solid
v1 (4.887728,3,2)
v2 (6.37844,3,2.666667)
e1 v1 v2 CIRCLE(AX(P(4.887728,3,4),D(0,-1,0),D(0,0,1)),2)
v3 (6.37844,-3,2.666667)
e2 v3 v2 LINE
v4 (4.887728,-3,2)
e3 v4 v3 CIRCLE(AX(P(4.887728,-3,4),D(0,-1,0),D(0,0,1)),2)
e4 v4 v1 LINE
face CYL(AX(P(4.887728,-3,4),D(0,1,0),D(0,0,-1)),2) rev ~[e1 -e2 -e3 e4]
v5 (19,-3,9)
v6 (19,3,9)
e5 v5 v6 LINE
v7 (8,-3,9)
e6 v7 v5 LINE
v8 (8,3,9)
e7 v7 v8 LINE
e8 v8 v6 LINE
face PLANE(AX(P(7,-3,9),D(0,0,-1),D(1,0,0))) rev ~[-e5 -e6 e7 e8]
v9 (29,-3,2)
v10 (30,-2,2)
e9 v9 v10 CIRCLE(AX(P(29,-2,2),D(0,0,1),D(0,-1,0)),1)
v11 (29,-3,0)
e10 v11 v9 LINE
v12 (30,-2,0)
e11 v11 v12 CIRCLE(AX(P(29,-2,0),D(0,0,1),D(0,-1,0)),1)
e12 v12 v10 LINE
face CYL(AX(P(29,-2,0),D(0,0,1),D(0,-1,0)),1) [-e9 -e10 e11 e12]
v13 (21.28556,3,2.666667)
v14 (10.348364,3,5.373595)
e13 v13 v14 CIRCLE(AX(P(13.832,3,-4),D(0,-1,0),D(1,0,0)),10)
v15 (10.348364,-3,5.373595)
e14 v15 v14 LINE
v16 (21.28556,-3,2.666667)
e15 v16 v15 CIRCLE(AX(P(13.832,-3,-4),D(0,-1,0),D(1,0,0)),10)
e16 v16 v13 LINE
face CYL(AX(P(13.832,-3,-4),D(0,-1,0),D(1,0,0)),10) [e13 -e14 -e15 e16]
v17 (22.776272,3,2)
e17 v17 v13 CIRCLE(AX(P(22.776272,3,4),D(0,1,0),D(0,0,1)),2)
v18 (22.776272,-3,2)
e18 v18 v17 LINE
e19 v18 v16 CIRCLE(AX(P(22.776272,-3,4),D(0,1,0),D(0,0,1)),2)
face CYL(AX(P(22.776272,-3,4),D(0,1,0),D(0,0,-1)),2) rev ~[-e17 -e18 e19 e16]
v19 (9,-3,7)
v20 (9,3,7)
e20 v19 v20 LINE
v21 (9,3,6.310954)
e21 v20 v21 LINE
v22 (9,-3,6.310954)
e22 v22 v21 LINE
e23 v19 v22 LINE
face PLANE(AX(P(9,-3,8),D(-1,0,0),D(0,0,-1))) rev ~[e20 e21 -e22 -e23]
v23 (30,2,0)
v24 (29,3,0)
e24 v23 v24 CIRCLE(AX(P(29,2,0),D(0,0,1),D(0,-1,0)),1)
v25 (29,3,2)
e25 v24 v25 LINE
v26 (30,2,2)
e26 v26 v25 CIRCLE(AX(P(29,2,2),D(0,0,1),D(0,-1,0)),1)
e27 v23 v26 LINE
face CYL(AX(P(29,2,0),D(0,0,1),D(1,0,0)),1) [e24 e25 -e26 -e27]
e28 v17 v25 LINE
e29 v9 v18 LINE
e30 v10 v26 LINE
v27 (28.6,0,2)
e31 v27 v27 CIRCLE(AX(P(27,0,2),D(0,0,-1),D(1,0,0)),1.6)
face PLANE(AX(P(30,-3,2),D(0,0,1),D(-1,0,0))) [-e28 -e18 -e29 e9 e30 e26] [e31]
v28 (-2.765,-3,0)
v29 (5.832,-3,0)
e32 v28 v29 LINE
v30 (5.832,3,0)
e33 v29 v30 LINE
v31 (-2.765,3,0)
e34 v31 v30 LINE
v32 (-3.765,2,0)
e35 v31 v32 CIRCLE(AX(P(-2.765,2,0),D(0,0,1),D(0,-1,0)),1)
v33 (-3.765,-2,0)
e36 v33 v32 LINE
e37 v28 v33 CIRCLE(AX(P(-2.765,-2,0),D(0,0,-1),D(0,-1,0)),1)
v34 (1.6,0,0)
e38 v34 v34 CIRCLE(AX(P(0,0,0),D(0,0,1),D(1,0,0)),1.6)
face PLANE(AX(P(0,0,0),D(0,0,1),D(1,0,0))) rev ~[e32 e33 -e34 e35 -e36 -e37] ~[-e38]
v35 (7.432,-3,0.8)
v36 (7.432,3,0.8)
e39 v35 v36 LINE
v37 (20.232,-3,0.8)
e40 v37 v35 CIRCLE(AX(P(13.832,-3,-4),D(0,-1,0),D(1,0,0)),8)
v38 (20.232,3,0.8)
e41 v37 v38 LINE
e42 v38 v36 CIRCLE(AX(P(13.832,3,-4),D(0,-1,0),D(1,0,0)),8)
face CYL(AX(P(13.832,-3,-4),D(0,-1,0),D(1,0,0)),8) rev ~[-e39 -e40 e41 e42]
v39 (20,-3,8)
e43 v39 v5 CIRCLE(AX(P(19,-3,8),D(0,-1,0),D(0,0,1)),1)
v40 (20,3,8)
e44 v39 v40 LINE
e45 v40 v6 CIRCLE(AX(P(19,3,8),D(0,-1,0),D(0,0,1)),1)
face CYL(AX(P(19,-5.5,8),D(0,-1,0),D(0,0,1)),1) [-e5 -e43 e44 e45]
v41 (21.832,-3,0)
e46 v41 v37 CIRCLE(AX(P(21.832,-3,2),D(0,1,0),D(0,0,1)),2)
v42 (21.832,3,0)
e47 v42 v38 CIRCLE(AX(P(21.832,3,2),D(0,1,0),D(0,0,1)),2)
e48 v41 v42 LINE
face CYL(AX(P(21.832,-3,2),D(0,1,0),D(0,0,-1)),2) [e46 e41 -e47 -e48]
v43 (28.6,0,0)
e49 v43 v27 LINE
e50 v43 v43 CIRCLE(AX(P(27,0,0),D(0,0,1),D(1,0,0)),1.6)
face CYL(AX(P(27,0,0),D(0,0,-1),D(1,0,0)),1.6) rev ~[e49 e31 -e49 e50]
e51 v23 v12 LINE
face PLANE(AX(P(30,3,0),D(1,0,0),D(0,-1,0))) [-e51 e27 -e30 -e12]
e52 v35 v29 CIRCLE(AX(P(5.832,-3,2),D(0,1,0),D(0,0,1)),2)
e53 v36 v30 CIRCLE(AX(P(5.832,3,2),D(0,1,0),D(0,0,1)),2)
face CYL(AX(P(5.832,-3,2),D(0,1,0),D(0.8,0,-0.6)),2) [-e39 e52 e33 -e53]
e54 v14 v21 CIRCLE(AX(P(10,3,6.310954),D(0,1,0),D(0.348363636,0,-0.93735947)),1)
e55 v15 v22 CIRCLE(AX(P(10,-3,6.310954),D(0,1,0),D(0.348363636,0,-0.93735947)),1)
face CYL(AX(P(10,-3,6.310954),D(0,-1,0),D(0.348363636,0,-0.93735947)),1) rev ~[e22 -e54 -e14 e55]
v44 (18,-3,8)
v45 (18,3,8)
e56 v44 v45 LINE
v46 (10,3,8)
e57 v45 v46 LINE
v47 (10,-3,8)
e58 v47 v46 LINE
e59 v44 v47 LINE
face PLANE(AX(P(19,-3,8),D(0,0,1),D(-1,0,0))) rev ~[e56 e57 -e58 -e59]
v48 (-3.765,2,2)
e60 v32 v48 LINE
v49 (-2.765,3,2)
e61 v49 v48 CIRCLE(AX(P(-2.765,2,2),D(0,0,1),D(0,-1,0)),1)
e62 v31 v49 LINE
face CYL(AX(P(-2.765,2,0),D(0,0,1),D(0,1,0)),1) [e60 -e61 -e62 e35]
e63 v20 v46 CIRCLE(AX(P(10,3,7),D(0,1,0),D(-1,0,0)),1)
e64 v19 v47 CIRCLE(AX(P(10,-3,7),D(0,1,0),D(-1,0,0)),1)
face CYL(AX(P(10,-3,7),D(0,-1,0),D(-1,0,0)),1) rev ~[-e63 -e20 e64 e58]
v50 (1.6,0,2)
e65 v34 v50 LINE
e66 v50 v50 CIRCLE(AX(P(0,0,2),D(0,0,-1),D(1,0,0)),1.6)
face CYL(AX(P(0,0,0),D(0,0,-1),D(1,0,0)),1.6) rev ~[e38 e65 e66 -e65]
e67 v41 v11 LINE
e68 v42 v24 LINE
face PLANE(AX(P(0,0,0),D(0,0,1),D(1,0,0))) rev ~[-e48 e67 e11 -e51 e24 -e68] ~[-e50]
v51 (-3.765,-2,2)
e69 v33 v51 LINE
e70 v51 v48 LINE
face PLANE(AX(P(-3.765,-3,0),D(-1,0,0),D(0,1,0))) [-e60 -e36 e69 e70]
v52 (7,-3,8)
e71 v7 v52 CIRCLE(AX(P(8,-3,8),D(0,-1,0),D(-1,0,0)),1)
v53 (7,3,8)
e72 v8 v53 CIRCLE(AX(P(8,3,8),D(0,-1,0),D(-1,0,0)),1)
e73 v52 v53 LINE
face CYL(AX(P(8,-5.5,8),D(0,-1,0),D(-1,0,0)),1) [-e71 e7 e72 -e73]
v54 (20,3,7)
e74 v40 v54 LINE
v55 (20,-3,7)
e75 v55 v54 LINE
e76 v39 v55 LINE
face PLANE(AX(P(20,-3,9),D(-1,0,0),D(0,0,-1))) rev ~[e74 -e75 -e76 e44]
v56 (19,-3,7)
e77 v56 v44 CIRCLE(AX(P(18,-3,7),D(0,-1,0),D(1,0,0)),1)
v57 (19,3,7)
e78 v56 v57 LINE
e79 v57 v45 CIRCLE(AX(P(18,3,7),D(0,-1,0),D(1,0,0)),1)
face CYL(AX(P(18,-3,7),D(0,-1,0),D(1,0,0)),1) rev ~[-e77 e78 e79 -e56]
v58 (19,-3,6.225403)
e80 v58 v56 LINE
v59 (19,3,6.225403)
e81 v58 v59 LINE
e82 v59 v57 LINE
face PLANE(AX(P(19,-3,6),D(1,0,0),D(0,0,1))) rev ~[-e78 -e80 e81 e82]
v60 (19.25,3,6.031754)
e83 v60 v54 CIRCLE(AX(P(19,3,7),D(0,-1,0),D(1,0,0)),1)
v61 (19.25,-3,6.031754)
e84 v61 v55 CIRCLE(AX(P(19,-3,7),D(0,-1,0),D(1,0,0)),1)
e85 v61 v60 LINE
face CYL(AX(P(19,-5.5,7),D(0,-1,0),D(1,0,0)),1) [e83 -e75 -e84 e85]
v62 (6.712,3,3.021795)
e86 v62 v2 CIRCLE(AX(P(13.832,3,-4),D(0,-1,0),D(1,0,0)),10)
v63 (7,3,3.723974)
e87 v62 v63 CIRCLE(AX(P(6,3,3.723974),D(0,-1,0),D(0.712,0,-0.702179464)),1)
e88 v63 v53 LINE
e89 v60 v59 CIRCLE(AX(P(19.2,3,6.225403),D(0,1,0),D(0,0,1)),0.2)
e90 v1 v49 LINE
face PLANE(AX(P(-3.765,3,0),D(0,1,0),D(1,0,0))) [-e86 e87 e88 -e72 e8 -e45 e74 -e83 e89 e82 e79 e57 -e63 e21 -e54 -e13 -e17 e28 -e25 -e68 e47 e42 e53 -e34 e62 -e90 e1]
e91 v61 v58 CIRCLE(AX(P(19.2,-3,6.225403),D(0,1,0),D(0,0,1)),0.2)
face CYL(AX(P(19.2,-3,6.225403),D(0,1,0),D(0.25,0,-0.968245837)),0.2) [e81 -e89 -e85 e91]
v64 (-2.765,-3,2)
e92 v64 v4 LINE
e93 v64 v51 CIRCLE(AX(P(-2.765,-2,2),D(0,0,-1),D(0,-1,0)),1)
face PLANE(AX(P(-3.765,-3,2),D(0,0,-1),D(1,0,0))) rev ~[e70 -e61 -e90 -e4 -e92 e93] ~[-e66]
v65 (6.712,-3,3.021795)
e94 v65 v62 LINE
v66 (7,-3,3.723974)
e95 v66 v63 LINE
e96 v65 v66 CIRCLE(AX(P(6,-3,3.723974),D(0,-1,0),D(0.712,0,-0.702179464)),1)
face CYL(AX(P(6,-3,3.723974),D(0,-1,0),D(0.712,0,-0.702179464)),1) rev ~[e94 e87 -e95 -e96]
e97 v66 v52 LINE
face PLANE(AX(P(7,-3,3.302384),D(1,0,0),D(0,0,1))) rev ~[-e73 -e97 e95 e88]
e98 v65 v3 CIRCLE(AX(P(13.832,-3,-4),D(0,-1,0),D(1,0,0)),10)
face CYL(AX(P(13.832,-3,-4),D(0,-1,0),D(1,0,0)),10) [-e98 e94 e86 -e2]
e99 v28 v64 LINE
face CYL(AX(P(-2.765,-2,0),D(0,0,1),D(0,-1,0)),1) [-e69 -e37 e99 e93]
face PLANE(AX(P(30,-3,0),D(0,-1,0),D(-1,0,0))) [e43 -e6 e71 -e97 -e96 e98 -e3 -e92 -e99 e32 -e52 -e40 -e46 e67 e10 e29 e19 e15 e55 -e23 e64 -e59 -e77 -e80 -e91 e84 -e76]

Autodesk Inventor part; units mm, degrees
ref_plane "YZ Plane" through (0, 0, 0) normal (1, 0, 0) x (0, 1, 0)
ref_plane "XZ Plane" through (0, 0, 0) normal (0, 1, 0) x (-1, 0, 0)
ref_plane "XY Plane" through (0, 0, 0) normal (0, 0, 1) x (1, 0, 0)
sketch "Skizze1" plane through (0, 0, 0) normal (0, 0, 1) x (1, 0, 0)
  line L0 (30, 3) -> (30, -3)
  line L1 (30, -3) -> (-3.765, -3)
  line L2 (-3.765, -3) -> (-3.765, 3)
  line L3 (-3.765, 3) -> (30, 3)
  circle A0 centre (0, 0) radius 1.6
  circle A1 centre (0, 0) radius 1.6
  circle A2 centre (27, 0) radius 1.6
  circle A3 centre (27, 0) radius 1.6
  line L4 (21.832, 1.0001) -> (21.832, -3)
  line L5 (21.832, -3) -> (5.832, -3)
  line L6 (5.832, -3) -> (5.832, 1.0001)
  line L7 (5.832, 1.0001) -> (21.832, 1.0001)
  dimension "d0" = 6
extrude "Extrusion1" add sketch "Skizze1" along normal blind 7
sketch "Skizze2" plane through (-3.765, -3, 0) normal (0, -1, 0) x (1, 0, 0)
  line L0 (0, 0) -> (33.765, 0) projected
  line L1 (0, 0) -> (9.597, 0)
  line L2 (9.597, 0) -> (25.597, 0)
  line L3 (17.597, 0) -> (17.597, -4)
  circle A0 centre (17.597, -4) radius 8
  line L4 (0, 0) -> (0, 2)
  circle A1 centre (17.597, -4) radius 10
  line L5 (0, 2) -> (9.597, 2)
  line L6 (0, 0) -> (0, 7) projected
  line L7 (33.765, 0) -> (33.765, 2)
  line L8 (33.765, 0) -> (33.765, 7) projected
  line L9 (33.765, 2) -> (25.597, 2)
  line L10 (33.765, 7) -> (0, 7) projected
  line L11 (0, 7) -> (33.765, 7)
  line L12 (33.765, 7) -> (33.765, 0)
  line L13 (33.765, 0) -> (0, 0)
  line L14 (0, 0) -> (0, 7)
  point P0 (3.765, 0)
  point P1 (24.5252, 0)
  point P2 (10.6688, 0)
  point P3 (17.597, 7)
  point P4 (8.4318, 0)
  point P5 (26.7622, 0)
  dimension "d3" = 9.597
  dimension "d4" = 16
  dimension "d5" = 4
  dimension "d6" = 16
  dimension "d7" = 2
  dimension "d8" = 2
  dimension "d9" = 2
extrude "Extrusion2" cut sketch "Skizze2" against normal blind 7 contours L6 L10 L8 L9 A1 L5 | A0 L0 picked at (13.3479, 0.4966)
fillet "Rundung1" radius 2 4 edges at (5.832, 0, 2) (6.9038, 0, 0) (20.7602, 0, 0) (21.832, 0, 2)
fillet "Rundung2" radius 1 4 edges at (-3.765, -3, 1) (30, -3, 1) (30, 3, 1) (-3.765, 3, 1)
sketch "Skizze3" plane through (13.832, -3, -4) normal (0, -1, 0) x (1, 0, 0)
  line L0 (-13.832, 4) -> (-6.832, 4)
  line L1 (-15.432, 3) -> (-12.232, 3) projected
  line L2 (-6.832, 4) -> (-6.832, 13)
  line L3 (-6.832, 13) -> (6.168, 13)
  line L4 (6.168, 13) -> (6.168, 10)
  line L5 (6.168, 10) -> (5.168, 10)
  line L6 (5.168, 10) -> (5.168, 12)
  line L7 (5.168, 12) -> (-4.832, 12)
  line L8 (-4.832, 12) -> (-4.832, 8.7551)
  arc A0 (7.4536, 6.6667) -> (-7.4536, 6.6667) centre (0, 0) ccw projected
  arc A1 (7.4536, 6.6667) -> (-7.4536, 6.6667) centre (0, 0) ccw
  point P0 (-13.832, 4)
  point P1 (-12.232, 3)
  point P2 (-6.832, 7.3023)
  point P3 (9.1652, 4)
  point P4 (-9.1652, 4)
  dimension "d14" = 7
  dimension "d15" = 9
  dimension "d16" = 13
  dimension "d17" = 3
  dimension "d18" = 1
  dimension "d19" = 2
  dimension "d20" = 10
extrude "Extrusion3" add sketch "Skizze3" against normal up to surface (6 mm away)
fillet "Rundung3" radius 1 7 edges at (20, 0, 6) (20, 0, 9) (7, 0, 9) (19, 0, 8) (9, 0, 8) (9, 0, 4.7551) (7, 0, 3.3023)
fillet "Rundung4" radius 0.2 2 edges at (19.0001, 0, 6) (19, 0, 6)
properties part number "DribblerMotorKlemme"
